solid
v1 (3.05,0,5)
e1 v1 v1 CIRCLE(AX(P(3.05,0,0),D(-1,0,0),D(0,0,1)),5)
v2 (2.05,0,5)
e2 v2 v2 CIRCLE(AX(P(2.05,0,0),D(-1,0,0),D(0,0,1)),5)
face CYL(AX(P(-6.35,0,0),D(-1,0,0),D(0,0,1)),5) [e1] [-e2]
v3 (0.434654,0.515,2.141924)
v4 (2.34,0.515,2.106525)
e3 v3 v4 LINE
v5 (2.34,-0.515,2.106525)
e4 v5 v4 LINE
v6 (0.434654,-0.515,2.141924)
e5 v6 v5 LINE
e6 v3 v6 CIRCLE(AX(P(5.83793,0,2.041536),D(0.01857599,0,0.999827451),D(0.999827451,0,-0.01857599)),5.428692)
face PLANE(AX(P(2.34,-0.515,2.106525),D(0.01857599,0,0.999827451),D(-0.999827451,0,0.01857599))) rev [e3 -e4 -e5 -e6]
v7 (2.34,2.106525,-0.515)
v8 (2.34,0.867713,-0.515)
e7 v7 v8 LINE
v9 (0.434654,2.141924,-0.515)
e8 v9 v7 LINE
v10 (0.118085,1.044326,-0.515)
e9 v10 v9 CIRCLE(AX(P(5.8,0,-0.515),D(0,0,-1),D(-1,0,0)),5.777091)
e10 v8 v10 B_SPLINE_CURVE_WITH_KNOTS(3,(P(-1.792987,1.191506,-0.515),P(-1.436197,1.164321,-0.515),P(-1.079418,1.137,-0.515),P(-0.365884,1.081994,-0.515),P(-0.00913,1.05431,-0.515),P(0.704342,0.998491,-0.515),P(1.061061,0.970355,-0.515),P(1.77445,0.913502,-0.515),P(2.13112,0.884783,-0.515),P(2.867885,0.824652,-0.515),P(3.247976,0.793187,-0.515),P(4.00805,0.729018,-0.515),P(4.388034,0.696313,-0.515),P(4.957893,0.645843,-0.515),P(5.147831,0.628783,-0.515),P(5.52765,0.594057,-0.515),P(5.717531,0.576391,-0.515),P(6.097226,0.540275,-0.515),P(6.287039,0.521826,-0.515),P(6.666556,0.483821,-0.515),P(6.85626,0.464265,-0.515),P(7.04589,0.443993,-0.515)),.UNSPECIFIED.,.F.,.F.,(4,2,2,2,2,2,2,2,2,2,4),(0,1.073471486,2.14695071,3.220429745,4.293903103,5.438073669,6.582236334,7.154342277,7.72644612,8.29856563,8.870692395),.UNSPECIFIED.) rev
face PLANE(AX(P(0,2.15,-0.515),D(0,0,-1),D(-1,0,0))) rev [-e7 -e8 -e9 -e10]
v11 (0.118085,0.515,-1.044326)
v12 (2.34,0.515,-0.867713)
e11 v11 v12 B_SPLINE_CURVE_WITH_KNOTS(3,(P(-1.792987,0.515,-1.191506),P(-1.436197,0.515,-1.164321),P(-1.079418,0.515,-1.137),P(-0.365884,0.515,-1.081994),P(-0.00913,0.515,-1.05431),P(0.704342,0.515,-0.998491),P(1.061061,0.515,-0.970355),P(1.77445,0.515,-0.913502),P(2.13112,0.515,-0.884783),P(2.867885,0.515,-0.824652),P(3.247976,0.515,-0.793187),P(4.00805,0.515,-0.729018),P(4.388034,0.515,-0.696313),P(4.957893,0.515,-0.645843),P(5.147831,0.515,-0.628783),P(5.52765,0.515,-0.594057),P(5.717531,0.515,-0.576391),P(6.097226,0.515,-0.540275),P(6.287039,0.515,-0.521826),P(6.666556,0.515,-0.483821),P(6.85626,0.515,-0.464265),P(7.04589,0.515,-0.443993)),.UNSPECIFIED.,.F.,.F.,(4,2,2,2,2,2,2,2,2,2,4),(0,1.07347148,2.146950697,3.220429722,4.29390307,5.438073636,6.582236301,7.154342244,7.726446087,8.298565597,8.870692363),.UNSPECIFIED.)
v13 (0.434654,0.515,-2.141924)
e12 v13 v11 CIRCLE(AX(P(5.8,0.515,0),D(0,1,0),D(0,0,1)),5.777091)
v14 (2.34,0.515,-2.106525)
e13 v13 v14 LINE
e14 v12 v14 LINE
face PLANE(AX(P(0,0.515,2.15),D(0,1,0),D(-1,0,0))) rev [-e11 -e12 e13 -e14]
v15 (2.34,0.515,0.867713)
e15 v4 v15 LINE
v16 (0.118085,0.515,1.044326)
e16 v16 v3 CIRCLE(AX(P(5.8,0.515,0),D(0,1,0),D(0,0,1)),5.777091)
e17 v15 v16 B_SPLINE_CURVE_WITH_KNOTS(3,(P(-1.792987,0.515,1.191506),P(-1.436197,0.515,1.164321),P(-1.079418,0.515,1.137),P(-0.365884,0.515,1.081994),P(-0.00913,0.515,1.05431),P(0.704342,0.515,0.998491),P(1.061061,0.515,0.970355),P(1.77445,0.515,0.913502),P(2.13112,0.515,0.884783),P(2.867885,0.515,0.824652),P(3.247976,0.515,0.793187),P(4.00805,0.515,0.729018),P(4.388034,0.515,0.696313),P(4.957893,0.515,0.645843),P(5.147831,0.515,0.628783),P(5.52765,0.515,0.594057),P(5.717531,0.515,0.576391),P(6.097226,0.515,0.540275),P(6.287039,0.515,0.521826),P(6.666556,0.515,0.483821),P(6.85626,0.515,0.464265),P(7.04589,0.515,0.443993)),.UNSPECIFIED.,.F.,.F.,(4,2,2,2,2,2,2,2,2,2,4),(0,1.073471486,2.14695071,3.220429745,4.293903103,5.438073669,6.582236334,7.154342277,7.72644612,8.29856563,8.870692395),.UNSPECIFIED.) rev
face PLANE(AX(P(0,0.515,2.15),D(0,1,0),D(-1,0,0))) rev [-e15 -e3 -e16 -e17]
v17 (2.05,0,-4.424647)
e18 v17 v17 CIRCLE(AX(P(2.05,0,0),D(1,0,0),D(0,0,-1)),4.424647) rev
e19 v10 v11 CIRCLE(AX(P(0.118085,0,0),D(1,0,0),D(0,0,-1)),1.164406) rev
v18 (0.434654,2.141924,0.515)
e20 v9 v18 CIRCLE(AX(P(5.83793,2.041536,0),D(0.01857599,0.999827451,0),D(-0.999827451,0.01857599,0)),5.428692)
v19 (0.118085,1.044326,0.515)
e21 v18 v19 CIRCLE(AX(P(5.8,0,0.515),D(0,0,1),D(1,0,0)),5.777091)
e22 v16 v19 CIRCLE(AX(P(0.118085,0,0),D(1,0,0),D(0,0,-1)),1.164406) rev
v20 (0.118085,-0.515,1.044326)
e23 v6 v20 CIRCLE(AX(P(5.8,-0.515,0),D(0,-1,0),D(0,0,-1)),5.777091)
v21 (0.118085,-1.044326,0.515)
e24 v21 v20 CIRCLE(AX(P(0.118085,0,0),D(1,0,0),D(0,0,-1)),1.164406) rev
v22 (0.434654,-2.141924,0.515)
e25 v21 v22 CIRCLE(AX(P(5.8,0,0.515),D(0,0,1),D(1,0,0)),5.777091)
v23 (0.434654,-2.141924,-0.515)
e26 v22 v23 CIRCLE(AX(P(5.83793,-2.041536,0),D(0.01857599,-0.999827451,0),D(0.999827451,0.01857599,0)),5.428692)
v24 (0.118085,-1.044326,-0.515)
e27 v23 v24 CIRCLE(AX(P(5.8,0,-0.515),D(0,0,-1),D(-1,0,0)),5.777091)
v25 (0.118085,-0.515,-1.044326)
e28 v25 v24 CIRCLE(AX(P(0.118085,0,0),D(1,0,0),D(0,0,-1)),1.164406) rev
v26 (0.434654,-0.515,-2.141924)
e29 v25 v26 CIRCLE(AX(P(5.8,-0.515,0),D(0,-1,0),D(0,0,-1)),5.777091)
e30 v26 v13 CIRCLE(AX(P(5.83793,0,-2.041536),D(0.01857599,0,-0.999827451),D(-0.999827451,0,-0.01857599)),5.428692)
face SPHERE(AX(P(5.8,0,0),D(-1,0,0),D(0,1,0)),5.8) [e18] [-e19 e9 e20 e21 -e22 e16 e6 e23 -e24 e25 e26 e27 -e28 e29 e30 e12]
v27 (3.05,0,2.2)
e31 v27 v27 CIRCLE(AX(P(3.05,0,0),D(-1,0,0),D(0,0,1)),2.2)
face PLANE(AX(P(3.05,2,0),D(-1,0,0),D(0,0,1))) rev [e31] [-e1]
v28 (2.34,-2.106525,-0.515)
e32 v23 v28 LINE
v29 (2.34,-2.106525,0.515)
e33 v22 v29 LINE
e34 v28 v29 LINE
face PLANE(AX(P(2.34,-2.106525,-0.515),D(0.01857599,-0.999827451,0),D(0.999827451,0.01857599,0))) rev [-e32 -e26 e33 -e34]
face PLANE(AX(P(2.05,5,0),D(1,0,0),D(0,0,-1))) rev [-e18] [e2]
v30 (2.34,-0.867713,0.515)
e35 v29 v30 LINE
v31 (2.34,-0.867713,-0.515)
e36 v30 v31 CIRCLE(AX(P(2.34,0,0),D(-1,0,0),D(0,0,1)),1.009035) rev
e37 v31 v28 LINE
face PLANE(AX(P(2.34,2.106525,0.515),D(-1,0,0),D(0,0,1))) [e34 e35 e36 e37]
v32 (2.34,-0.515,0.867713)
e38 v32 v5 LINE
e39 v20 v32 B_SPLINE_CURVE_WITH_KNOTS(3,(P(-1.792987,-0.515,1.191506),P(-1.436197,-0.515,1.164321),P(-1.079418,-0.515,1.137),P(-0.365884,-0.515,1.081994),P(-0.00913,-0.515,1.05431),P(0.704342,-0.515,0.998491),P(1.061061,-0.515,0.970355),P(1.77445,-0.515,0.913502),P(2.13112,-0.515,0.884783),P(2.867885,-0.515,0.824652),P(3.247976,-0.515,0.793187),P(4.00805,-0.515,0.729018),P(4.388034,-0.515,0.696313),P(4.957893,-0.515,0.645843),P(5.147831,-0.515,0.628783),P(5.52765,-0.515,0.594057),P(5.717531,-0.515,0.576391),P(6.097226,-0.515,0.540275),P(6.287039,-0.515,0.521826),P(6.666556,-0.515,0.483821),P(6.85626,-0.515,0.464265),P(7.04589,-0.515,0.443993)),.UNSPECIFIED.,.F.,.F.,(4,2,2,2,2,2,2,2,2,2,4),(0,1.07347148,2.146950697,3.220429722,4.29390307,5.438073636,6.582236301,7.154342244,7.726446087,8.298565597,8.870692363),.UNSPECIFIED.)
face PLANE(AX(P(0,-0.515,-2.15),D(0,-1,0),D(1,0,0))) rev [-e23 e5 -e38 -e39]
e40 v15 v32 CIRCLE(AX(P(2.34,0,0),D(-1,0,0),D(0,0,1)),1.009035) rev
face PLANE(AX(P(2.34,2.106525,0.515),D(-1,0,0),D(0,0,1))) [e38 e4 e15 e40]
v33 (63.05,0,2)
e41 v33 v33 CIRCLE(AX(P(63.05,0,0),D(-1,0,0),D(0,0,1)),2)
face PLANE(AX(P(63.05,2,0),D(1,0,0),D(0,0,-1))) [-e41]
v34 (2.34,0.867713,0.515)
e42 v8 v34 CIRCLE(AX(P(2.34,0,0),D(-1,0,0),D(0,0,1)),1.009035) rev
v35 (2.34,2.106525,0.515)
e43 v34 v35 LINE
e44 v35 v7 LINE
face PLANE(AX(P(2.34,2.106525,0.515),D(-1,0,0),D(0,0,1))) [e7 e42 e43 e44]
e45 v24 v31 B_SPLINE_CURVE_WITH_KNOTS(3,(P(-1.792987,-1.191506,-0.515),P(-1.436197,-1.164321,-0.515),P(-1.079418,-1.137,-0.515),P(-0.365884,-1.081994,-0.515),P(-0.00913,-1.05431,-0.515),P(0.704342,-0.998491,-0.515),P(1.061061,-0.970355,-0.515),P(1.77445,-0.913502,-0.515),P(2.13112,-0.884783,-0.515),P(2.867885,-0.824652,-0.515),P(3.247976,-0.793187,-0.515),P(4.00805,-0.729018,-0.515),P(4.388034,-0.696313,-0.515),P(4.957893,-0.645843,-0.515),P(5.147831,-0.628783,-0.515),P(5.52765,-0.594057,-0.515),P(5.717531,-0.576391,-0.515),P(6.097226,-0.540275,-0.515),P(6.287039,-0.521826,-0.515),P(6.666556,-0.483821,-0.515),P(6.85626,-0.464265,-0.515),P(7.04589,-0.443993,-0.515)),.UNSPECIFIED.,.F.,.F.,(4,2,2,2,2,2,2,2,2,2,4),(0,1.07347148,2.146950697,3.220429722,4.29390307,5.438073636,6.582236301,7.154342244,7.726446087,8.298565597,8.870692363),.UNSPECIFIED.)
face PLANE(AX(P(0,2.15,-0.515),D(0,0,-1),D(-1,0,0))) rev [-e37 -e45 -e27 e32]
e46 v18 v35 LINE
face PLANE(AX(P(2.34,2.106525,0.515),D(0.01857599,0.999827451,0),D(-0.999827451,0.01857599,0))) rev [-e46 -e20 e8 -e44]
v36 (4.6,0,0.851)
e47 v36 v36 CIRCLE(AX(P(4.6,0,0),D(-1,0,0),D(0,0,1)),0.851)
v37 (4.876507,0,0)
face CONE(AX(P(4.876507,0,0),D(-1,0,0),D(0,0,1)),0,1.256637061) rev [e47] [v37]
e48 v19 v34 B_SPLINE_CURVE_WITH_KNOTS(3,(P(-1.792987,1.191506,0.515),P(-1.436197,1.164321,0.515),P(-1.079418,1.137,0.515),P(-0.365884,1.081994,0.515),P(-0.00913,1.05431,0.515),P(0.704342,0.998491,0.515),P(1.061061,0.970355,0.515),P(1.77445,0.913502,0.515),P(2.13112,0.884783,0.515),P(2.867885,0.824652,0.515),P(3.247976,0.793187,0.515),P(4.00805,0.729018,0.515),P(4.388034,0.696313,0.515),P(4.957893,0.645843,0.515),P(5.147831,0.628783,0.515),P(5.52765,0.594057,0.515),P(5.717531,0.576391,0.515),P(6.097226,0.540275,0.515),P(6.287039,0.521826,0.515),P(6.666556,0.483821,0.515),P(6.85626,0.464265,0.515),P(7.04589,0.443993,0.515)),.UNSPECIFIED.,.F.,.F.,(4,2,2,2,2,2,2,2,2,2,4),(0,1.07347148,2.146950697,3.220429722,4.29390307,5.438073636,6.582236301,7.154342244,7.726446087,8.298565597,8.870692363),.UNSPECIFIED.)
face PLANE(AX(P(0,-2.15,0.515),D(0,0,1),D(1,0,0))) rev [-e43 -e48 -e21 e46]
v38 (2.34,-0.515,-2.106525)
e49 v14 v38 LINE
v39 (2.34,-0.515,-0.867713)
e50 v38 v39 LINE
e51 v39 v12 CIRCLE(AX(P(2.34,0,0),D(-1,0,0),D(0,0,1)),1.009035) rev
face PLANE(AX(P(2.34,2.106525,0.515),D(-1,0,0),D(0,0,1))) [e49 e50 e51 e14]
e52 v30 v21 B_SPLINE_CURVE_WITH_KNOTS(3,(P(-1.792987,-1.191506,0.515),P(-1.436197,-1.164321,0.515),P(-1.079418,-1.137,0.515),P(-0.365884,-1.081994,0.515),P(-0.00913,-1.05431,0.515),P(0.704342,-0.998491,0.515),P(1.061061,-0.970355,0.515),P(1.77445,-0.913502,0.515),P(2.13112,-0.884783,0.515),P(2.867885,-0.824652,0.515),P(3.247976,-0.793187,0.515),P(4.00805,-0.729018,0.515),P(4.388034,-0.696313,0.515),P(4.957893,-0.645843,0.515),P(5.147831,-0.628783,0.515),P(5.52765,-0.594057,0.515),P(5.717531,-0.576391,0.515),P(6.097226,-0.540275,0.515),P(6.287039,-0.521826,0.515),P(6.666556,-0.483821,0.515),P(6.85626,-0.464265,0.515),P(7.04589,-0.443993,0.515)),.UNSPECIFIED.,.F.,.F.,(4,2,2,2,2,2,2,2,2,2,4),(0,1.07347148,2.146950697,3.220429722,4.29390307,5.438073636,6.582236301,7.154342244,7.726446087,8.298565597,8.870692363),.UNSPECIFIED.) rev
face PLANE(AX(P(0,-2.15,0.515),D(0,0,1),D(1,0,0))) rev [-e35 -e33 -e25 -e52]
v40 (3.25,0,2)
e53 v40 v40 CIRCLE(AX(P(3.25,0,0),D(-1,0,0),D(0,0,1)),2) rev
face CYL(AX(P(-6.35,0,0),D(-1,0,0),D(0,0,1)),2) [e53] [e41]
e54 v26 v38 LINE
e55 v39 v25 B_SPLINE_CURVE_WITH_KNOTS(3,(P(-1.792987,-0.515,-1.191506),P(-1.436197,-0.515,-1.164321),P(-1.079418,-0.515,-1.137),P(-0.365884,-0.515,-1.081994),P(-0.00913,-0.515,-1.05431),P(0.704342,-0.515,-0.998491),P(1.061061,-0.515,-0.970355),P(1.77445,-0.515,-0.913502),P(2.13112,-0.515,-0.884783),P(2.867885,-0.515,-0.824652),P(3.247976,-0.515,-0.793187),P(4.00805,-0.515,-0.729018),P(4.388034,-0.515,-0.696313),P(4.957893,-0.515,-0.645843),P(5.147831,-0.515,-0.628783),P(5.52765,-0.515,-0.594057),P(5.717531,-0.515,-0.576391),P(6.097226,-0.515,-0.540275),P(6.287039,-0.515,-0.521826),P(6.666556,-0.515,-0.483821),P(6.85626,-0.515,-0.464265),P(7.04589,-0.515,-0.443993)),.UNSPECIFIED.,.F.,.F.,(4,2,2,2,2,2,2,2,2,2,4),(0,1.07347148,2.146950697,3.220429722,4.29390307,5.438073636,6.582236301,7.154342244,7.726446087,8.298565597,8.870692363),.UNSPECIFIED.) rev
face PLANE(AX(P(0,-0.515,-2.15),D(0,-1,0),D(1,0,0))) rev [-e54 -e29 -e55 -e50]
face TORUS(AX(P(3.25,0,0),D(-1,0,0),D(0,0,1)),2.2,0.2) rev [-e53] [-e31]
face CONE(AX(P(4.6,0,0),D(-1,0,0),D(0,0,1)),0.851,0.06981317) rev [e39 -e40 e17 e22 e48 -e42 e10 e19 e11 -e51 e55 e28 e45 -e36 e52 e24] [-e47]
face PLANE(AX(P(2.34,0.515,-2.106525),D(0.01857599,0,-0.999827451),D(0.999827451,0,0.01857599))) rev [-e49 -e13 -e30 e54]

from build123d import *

# Parameters (mm, degrees)
RECPAT_COUNT = 2
RECPAT_ANGLE = 90


with BuildPart() as part:
    # Fillet1: read off the stored shape, not the designer's step
    # Fillet1 outline → Fillet1 (revolve)
    with BuildSketch(Plane.YX):
        with BuildLine():
            Line((2, 3.25), (2, 63.05))
            Line((2, 63.05), (0, 63.05))
            Line((0, 63.05), (0, 2.05))
            Line((0, 2.05), (5, 2.05))
            Line((5, 2.05), (5, 3.05))
            Line((5, 3.05), (2.2, 3.05))
            ThreePointArc((2.2, 3.05), (2.058578644, 3.108578644), (2, 3.25))
        make_face()
    revolve(axis=Axis((0, 0, 0), (1, 0, 0)))

    # PanSke → Pan (revolve)
    with BuildSketch(Plane.XY, mode=Mode.PRIVATE) as pan_sk:
        with BuildLine():
            Line((2.05, 4.424646879), (2.05, 0))
            Line((2.05, 0), (0, 0))
            ThreePointArc((0, 0), (0.537396082, 2.438237068), (2.05, 4.424646879))
        make_face()
    revolve(pan_sk.sketch.rotate(Axis((0, 0, 0), (1, 0, 0)), 90), axis=Axis((0, 0, 0), (1, 0, 0)))

    # Sketch3 → Recess section 0
    with BuildSketch(Plane(origin=(0, 0, 0), x_dir=(0, 0, -1), z_dir=(1, 0, 0))):
        with BuildLine():
            Line((-0.515, 2.15), (0.515, 2.15))
            Line((0.515, 2.15), (0.515, -2.15))
            Line((0.515, -2.15), (-0.515, -2.15))
            Line((-0.515, -2.15), (-0.515, 2.15))
        make_face()
    # Sketch4 → Recess section 1
    with BuildSketch(Plane(origin=(2.34, 0, 0), x_dir=(0, 0, -1), z_dir=(1, 0, 0))):
        with BuildLine():
            Line((-0.515, 2.106524682), (0.515, 2.106524682))
            Line((0.515, 2.106524682), (0.515, -2.106524682))
            Line((0.515, -2.106524682), (-0.515, -2.106524682))
            Line((-0.515, -2.106524682), (-0.515, 2.106524682))
        make_face()
    recess = loft(mode=Mode.SUBTRACT)

    # RecPat: Recess ×2 about axis
    recpat_axis = Axis((0, 0, 0), (1, 0, 0))
    for i in range(1, RECPAT_COUNT):
        add(recess.rotate(recpat_axis, i * RECPAT_ANGLE / (RECPAT_COUNT - 1)), mode=Mode.SUBTRACT)

    # RecCorSke → RecessCore (revolve, cut)
    with BuildSketch(Plane.XY, mode=Mode.PRIVATE) as recesscore_sk:
        Polygon((0, 0), (0, 1.172663335), (4.6, 0.851), (4.876506661, 0), align=None)
    revolve(recesscore_sk.sketch.rotate(Axis((-3.175, 0, 0), (1, 0, 0)), 90), axis=Axis((-3.175, 0, 0), (1, 0, 0)), mode=Mode.SUBTRACT)


solid = part.part
